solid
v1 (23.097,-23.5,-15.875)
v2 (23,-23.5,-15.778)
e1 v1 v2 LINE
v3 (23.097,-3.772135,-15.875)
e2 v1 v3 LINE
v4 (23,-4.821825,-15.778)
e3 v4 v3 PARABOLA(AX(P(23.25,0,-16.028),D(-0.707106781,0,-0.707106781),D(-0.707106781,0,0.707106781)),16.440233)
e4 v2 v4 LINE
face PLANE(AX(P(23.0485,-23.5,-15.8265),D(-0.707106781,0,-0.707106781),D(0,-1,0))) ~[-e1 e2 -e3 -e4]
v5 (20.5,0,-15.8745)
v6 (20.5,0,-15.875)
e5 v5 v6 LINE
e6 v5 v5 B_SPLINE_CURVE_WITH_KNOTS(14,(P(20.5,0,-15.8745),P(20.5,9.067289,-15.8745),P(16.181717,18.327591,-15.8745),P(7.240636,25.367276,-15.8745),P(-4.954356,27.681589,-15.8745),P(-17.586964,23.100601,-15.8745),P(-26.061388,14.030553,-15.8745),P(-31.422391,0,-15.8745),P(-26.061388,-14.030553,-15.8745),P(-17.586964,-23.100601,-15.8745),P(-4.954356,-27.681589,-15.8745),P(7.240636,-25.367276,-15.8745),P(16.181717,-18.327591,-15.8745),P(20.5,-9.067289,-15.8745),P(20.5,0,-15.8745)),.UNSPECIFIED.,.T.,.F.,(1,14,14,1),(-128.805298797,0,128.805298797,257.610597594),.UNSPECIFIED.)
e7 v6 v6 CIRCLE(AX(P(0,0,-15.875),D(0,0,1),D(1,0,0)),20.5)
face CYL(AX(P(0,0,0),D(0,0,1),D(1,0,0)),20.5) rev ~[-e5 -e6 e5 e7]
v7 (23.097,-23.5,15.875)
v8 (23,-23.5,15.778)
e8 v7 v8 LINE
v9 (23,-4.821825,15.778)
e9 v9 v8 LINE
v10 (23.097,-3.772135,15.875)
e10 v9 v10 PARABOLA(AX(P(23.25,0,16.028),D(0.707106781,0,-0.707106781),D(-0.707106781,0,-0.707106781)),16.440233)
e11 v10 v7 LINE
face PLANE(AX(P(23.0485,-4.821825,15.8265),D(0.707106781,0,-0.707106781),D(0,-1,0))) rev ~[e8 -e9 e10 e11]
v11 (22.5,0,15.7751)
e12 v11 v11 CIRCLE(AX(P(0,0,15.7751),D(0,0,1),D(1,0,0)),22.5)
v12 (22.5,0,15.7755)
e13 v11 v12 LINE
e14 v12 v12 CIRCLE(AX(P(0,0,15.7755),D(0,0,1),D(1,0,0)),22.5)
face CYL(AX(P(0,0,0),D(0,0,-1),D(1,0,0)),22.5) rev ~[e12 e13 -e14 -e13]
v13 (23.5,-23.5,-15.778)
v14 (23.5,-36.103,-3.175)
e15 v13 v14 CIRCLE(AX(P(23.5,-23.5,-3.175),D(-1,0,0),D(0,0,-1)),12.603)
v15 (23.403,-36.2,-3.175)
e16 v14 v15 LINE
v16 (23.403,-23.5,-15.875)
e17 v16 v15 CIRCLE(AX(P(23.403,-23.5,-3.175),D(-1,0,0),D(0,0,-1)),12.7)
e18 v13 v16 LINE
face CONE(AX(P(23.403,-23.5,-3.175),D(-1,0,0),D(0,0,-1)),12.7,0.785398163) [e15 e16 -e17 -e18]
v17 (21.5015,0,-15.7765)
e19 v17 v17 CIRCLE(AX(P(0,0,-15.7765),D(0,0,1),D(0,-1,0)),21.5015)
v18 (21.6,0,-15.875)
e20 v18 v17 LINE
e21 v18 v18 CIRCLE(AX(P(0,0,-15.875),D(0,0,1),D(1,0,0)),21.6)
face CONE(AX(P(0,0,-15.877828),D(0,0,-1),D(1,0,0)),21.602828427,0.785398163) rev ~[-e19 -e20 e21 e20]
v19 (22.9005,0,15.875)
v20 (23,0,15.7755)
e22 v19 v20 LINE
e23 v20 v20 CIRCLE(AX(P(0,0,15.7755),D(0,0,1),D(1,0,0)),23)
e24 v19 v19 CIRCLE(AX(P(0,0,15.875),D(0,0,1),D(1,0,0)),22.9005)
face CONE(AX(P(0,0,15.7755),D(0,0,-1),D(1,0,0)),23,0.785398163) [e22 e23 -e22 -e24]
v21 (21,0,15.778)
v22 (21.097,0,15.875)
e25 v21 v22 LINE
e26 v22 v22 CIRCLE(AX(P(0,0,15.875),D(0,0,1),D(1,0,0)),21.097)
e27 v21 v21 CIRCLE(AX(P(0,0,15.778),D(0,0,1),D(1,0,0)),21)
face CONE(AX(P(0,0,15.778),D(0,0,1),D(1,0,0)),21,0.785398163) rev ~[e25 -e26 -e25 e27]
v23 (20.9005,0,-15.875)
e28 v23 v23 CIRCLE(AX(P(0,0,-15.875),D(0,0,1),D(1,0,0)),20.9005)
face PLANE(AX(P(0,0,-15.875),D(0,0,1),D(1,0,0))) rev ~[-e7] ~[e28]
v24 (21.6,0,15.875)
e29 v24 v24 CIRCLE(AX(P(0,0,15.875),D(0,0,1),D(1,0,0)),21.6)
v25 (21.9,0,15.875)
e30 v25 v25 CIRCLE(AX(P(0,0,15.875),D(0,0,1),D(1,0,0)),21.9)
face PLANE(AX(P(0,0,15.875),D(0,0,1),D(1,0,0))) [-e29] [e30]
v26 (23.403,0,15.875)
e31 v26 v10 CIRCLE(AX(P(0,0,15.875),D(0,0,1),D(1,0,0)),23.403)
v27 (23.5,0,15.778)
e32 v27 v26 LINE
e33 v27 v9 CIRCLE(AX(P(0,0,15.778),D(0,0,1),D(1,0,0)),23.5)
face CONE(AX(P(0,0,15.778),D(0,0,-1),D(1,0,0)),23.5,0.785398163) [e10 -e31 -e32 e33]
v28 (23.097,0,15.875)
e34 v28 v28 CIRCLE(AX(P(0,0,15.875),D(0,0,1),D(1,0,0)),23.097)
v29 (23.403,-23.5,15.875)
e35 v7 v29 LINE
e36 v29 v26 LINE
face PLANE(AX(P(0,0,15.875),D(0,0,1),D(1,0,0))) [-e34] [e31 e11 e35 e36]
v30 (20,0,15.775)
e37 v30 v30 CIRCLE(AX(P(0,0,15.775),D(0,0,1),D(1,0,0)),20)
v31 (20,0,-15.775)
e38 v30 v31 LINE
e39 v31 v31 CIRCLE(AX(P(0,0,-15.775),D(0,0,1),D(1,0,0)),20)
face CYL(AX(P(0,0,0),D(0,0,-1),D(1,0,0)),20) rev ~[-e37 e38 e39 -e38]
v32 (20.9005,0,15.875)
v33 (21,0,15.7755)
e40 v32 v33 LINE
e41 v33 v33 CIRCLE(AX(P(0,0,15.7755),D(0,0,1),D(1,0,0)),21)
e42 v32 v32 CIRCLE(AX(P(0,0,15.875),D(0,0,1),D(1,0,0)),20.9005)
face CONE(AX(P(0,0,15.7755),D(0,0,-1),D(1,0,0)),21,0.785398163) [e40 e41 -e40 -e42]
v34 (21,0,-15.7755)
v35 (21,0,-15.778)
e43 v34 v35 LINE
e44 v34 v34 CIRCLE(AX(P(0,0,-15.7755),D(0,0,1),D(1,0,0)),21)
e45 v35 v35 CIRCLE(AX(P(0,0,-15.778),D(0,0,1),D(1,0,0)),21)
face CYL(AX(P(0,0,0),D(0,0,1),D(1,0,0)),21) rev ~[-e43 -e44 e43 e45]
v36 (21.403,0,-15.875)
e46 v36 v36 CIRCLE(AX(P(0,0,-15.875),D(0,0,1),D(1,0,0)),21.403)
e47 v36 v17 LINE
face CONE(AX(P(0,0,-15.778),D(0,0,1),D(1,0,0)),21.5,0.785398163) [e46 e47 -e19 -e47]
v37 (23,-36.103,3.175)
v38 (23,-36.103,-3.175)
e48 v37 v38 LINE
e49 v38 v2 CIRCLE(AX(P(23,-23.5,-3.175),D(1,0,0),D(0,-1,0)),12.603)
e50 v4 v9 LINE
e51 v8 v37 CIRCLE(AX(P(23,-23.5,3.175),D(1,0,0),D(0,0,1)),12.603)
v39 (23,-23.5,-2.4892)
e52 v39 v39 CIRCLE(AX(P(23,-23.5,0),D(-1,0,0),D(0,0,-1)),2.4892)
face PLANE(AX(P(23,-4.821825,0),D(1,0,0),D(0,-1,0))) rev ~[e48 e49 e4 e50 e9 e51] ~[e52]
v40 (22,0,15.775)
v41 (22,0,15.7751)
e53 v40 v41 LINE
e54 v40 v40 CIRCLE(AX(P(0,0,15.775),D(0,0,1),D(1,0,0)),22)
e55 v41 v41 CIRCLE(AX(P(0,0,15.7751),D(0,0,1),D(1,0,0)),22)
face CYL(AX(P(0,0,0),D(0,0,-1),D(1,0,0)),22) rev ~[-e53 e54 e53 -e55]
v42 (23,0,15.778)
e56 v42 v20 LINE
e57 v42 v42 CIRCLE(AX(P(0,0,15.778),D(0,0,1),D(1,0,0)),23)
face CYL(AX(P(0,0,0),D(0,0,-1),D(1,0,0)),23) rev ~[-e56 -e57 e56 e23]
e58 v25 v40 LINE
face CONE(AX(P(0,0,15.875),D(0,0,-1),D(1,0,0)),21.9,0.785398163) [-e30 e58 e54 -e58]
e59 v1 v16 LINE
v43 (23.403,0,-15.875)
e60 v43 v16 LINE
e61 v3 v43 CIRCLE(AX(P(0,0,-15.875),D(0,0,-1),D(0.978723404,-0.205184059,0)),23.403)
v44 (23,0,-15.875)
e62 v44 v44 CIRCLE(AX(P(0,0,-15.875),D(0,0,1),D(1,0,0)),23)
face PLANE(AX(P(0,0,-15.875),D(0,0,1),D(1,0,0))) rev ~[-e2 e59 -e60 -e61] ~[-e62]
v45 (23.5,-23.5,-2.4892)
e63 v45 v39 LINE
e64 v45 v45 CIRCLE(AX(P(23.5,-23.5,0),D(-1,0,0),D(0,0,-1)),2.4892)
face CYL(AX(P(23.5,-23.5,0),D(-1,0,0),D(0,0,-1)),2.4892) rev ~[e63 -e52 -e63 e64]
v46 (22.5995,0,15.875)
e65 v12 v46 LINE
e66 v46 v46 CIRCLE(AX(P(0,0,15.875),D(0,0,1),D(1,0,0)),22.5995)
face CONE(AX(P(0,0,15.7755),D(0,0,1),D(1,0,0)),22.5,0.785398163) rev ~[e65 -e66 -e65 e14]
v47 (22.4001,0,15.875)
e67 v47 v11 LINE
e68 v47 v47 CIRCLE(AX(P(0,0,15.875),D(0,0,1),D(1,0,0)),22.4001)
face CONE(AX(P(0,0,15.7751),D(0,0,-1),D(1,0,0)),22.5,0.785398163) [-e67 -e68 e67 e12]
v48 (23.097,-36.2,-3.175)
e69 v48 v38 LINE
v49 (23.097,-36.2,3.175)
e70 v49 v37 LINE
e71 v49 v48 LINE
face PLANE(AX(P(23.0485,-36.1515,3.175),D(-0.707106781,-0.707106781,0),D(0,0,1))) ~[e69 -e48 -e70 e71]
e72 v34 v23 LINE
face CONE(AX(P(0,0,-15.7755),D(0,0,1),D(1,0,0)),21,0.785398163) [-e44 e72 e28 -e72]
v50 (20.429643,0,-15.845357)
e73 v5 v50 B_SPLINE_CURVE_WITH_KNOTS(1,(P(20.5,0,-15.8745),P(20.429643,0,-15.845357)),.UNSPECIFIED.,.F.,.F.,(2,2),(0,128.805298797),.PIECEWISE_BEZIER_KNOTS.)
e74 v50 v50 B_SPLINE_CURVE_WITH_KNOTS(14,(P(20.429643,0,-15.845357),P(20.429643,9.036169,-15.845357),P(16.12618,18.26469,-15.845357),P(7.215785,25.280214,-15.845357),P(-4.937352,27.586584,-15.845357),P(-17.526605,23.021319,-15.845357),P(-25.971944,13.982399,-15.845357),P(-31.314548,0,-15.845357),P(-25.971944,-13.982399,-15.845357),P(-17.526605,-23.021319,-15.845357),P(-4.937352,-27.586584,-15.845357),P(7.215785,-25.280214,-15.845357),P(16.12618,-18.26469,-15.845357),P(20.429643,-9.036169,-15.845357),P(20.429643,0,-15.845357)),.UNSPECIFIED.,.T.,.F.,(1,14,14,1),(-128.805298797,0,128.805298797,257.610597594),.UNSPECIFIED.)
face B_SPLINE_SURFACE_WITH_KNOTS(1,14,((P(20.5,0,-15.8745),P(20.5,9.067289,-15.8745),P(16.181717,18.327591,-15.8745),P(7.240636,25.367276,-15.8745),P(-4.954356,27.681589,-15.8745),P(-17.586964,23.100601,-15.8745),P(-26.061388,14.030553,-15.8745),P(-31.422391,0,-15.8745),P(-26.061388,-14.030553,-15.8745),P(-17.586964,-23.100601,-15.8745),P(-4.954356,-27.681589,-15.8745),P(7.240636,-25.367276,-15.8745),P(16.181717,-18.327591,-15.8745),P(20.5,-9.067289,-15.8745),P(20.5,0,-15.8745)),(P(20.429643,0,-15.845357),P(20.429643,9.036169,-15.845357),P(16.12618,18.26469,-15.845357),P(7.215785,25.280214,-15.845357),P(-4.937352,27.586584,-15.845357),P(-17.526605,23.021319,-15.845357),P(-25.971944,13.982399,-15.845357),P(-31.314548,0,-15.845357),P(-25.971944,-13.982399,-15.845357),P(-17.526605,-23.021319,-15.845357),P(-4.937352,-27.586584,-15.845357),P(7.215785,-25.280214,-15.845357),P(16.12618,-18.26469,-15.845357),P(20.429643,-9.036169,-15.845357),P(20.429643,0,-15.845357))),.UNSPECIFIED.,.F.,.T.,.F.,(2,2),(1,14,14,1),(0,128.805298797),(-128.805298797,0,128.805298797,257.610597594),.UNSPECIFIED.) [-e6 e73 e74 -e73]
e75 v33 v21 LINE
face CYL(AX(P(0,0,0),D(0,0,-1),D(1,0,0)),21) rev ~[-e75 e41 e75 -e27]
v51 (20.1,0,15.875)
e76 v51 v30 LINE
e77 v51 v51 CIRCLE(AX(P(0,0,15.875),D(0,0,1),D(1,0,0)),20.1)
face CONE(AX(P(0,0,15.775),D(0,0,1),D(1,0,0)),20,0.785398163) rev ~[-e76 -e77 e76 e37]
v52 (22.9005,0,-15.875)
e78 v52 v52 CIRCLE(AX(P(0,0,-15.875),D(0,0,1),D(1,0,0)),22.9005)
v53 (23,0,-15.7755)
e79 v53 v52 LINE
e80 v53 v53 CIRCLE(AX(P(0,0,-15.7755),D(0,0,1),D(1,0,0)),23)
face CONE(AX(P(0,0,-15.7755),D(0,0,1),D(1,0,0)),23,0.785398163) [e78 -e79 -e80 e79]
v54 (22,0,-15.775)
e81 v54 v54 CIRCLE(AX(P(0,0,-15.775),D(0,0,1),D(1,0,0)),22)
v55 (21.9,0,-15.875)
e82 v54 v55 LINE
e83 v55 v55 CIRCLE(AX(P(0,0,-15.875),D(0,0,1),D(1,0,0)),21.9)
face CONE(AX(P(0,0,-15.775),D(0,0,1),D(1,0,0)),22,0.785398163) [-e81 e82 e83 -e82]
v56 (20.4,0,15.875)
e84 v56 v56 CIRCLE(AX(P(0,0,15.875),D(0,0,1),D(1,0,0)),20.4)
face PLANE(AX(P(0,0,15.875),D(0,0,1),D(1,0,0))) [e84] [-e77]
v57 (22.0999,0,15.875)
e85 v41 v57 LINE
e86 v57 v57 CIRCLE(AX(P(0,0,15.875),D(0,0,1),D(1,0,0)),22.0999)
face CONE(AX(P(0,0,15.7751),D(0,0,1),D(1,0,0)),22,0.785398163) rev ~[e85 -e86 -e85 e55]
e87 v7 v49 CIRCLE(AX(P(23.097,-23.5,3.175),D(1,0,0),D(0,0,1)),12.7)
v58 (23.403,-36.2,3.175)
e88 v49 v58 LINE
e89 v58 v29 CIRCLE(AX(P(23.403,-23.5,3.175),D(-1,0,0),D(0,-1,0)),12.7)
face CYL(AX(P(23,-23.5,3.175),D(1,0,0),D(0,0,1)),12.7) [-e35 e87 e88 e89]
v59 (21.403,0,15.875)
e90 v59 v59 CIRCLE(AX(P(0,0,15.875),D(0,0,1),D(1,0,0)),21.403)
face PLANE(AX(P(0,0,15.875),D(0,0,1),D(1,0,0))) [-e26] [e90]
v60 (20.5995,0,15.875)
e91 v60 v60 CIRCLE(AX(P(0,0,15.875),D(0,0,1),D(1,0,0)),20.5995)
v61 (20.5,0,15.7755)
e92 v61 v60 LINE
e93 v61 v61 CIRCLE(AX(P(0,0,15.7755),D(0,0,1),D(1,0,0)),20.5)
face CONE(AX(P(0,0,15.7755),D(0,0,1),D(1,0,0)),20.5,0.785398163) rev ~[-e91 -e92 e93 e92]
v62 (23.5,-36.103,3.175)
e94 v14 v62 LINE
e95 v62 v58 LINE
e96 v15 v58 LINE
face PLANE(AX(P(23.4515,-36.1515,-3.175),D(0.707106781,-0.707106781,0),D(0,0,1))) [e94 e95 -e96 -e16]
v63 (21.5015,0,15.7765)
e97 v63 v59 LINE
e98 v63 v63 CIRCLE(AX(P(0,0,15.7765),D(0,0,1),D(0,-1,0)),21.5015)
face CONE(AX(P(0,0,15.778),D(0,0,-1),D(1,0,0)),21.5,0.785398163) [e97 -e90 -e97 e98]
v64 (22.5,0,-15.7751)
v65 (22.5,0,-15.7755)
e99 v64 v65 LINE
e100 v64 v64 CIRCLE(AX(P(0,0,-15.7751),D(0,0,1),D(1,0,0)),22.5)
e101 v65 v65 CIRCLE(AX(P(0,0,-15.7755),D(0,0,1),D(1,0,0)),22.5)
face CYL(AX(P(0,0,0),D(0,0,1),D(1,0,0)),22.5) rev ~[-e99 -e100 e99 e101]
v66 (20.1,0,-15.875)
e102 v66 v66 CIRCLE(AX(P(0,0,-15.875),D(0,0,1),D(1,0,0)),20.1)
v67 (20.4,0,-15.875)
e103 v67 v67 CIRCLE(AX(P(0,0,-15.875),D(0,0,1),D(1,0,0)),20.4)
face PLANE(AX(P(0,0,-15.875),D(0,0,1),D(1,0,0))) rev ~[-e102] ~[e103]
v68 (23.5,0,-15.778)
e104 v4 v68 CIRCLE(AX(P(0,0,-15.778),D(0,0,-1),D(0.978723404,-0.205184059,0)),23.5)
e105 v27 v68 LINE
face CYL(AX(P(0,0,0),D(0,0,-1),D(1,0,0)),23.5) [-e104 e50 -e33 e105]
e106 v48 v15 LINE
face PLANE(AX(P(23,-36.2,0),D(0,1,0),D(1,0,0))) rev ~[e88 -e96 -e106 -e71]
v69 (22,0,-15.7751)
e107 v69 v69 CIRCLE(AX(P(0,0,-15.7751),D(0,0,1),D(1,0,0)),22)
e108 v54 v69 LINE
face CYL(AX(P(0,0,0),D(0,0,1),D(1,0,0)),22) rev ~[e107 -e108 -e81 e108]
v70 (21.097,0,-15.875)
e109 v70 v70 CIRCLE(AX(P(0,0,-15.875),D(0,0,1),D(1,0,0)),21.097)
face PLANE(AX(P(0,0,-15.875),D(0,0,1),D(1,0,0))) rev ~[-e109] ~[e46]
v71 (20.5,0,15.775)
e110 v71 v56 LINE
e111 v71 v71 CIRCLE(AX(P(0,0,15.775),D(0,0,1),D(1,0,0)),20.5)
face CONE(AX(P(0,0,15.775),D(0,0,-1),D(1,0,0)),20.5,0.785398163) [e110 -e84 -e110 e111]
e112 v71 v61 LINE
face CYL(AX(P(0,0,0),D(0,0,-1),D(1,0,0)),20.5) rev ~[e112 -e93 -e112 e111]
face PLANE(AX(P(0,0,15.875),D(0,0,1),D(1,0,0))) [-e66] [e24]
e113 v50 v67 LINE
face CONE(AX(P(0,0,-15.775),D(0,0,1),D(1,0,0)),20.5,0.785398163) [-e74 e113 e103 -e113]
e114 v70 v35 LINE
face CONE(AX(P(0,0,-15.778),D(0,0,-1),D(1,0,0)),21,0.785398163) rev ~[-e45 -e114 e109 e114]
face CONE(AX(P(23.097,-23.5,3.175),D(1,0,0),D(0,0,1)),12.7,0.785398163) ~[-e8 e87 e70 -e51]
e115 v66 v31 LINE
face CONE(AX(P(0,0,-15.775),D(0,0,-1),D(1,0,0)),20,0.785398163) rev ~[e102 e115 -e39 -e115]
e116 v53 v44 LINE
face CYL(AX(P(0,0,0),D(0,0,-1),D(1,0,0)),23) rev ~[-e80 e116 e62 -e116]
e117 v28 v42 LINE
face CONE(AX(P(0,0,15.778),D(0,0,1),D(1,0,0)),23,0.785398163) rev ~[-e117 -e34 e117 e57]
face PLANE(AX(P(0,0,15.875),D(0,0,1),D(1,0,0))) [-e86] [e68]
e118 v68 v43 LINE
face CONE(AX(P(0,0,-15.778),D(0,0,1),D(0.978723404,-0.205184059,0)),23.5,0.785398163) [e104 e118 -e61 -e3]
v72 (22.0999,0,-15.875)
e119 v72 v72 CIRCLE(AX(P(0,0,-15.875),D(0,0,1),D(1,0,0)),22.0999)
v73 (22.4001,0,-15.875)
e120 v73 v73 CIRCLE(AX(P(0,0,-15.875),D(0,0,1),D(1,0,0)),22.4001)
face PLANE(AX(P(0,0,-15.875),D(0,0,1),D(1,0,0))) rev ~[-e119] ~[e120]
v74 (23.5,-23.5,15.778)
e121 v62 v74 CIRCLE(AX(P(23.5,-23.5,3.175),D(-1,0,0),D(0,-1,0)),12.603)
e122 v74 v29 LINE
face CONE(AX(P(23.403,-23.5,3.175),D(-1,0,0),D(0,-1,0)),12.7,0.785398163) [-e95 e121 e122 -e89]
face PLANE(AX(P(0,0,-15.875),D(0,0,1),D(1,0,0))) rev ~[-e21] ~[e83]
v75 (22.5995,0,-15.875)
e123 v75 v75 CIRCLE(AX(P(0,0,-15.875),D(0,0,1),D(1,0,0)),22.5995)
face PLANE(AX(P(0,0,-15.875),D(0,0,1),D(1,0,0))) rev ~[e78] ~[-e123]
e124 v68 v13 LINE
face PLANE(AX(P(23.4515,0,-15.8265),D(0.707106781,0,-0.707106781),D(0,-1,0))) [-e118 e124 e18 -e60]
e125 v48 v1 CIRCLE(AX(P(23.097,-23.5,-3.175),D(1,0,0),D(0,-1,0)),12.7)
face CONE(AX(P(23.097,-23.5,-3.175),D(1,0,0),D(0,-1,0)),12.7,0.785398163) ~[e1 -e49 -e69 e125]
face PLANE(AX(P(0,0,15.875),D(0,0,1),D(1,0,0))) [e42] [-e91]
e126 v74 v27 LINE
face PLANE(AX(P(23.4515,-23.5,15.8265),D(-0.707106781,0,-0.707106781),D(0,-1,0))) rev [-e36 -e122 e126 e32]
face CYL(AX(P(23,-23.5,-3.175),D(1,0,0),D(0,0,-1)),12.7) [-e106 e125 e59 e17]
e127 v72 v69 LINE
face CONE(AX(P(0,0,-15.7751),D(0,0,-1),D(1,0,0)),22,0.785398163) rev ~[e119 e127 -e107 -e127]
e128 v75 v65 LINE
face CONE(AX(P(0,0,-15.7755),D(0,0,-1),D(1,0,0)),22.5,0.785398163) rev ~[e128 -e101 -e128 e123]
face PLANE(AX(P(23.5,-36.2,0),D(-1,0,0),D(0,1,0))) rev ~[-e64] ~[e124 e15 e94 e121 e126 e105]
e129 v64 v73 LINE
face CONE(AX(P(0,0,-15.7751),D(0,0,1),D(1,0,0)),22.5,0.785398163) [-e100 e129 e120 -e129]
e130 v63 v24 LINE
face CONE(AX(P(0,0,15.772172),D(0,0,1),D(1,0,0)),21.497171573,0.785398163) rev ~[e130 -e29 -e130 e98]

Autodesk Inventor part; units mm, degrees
ref_plane "YZ Plane" through (0, 0, 0) normal (1, 0, 0) x (0, 1, 0)
ref_plane "XZ Plane" through (0, 0, 0) normal (0, 1, 0) x (-1, 0, 0)
ref_plane "XY Plane" through (0, 0, 0) normal (0, 0, 1) x (1, 0, 0)
sketch "Sketch1" plane through (0, 0, 0) normal (0, 0, 1) x (1, 0, 0)
  circle A0 centre (0, 0) radius 20
  circle A1 centre (0, 0) radius 23.5
  line L0 (23.5, 0) -> (23, 0)
  line L1 (23, 0) -> (23, -36.2)
  line L2 (23, -36.2) -> (23.5, -36.2)
  line L3 (23.5, -36.2) -> (23.5, 0)
  circle A2 centre (0, 0) radius 23
  circle A3 centre (0, 0) radius 22.5
  circle A4 centre (0, 0) radius 22
  circle A5 centre (0, 0) radius 21.5
  circle A6 centre (0, 0) radius 21
  circle A7 centre (0, 0) radius 20.5
  point P0 (23, -4.8218)
  point P1 (0, -23.5)
  dimension "d0" = 40
  dimension "d1" = 47
  dimension "d2" = 0.5
  dimension "d3" = 0.5
  dimension "d4" = 0.5
  dimension "d5" = 0.5
  dimension "d6" = 0.5
  dimension "d7" = 0.5
  dimension "d58" = 12.7
extrude "Extrusion1" add sketch "Sketch1" along normal mid plane 31.75 contours A7
chamfer "Chamfer3" distance 0.1 angle 45 4 edges at (-20.5, 0, 15.875) (-20, 0, 15.875) (-20.5, 0, -15.875) (-20, 0, -15.875)
extrude "Extrusion2" add sketch "Sketch1" along normal mid plane 31.75 contours A6
chamfer "Chamfer4" distance 0.1 angle 45 4 edges at (-21, 0, 15.875) (-21, 0, -15.875) (-20.5, 0, 15.875) (-20.5, 0, -15.775)
extrude "Extrusion3" add sketch "Sketch1" along normal mid plane 31.75 contours A5
chamfer "Chamfer5" distance 0.1 angle 45 4 edges at (-21.5, 0, 15.875) (-21, 0, 15.875) (-21.5, 0, -15.875) (-21, 0, -15.875)
extrude "Extrusion4" add sketch "Sketch1" along normal mid plane 31.75 contours A4
chamfer "Chamfer6" distance 0.1 angle 45 4 edges at (-22, 0, 15.875) (-21.5, 0, 15.875) (-22, 0, -15.875) (-21.5, 0, -15.875)
extrude "Extrusion5" add sketch "Sketch1" along normal mid plane 31.75 contours A3
chamfer "Chamfer7" distance 0.1 angle 45 4 edges at (-22.5, 0, 15.875) (-22, 0, 15.875) (-22.5, 0, -15.875) (-22, 0, -15.875)
extrude "Extrusion6" add sketch "Sketch1" along normal mid plane 31.75 contours A2
chamfer "Chamfer8" distance 0.1 angle 45 4 edges at (-23, 0, 15.875) (-22.5, 0, 15.875) (-23, 0, -15.875) (-22.5, 0, -15.875)
extrude "Extrusion7" add sketch "Sketch1" along normal mid plane 31.75 contours L0 L1 A1 | L3 L2 L1 A1 | A1 L1 L0
fillet "Fillet1" radius 12.7 2 edges at (23.25, -36.2, 15.875) (23.25, -36.2, -15.875)
chamfer "Chamfer9" distance 0.1 angle 45 9 edges at (23.5, -11.75, 15.875) (-23.3747, 2.4238, 15.875) (23.5, -32.4803, 12.1553) (23.5, -11.75, -15.875) (-23.3747, 2.4238, -15.875) (-23, 0, 15.875) (23, -14.1609, 15.875) (23, -32.4803, 12.1553) (23, -14.1609, -15.875)
sketch "Sketch2" plane through (23.5, -23.5, 15.775) normal (1, 0, 0) x (0, 0, -1)
  line L0 (0, 0) -> (0, 23.5) projected
  arc A0 (0, 0) -> (12.6, -12.6) centre (12.6, 0) ccw projected
  line L1 (18.95, -12.6) -> (12.6, -12.6) projected
  arc A1 (18.95, -12.6) -> (31.55, 0) centre (18.95, 0) ccw projected
  line L2 (31.55, 23.5) -> (31.55, 0) projected
  line L3 (31.55, 23.5) -> (0, 23.5) projected
  line L4 (12.6, 0) -> (18.95, 0)
  point P0 (15.775, 23.5)
  point P1 (15.775, 0)
hole "Hole1" at (23.5, -23.5, 0) direction (-1, 0, 0) diameter 4.9784 depth 0.5
equation "\"d3\" = d2"
equation "\"d13\" = Thickness"
equation "\"d18\" = Thickness"
equation "\"d20\" = Thickness"
equation "\"d22\" = Thickness"
equation "\"d24\" = Thickness"
equation "\"d26\" = Thickness"
equation "\"Thickness\" = 31.75"
properties part number "TTB Elevator Constant Force Spring" material "Steel"
